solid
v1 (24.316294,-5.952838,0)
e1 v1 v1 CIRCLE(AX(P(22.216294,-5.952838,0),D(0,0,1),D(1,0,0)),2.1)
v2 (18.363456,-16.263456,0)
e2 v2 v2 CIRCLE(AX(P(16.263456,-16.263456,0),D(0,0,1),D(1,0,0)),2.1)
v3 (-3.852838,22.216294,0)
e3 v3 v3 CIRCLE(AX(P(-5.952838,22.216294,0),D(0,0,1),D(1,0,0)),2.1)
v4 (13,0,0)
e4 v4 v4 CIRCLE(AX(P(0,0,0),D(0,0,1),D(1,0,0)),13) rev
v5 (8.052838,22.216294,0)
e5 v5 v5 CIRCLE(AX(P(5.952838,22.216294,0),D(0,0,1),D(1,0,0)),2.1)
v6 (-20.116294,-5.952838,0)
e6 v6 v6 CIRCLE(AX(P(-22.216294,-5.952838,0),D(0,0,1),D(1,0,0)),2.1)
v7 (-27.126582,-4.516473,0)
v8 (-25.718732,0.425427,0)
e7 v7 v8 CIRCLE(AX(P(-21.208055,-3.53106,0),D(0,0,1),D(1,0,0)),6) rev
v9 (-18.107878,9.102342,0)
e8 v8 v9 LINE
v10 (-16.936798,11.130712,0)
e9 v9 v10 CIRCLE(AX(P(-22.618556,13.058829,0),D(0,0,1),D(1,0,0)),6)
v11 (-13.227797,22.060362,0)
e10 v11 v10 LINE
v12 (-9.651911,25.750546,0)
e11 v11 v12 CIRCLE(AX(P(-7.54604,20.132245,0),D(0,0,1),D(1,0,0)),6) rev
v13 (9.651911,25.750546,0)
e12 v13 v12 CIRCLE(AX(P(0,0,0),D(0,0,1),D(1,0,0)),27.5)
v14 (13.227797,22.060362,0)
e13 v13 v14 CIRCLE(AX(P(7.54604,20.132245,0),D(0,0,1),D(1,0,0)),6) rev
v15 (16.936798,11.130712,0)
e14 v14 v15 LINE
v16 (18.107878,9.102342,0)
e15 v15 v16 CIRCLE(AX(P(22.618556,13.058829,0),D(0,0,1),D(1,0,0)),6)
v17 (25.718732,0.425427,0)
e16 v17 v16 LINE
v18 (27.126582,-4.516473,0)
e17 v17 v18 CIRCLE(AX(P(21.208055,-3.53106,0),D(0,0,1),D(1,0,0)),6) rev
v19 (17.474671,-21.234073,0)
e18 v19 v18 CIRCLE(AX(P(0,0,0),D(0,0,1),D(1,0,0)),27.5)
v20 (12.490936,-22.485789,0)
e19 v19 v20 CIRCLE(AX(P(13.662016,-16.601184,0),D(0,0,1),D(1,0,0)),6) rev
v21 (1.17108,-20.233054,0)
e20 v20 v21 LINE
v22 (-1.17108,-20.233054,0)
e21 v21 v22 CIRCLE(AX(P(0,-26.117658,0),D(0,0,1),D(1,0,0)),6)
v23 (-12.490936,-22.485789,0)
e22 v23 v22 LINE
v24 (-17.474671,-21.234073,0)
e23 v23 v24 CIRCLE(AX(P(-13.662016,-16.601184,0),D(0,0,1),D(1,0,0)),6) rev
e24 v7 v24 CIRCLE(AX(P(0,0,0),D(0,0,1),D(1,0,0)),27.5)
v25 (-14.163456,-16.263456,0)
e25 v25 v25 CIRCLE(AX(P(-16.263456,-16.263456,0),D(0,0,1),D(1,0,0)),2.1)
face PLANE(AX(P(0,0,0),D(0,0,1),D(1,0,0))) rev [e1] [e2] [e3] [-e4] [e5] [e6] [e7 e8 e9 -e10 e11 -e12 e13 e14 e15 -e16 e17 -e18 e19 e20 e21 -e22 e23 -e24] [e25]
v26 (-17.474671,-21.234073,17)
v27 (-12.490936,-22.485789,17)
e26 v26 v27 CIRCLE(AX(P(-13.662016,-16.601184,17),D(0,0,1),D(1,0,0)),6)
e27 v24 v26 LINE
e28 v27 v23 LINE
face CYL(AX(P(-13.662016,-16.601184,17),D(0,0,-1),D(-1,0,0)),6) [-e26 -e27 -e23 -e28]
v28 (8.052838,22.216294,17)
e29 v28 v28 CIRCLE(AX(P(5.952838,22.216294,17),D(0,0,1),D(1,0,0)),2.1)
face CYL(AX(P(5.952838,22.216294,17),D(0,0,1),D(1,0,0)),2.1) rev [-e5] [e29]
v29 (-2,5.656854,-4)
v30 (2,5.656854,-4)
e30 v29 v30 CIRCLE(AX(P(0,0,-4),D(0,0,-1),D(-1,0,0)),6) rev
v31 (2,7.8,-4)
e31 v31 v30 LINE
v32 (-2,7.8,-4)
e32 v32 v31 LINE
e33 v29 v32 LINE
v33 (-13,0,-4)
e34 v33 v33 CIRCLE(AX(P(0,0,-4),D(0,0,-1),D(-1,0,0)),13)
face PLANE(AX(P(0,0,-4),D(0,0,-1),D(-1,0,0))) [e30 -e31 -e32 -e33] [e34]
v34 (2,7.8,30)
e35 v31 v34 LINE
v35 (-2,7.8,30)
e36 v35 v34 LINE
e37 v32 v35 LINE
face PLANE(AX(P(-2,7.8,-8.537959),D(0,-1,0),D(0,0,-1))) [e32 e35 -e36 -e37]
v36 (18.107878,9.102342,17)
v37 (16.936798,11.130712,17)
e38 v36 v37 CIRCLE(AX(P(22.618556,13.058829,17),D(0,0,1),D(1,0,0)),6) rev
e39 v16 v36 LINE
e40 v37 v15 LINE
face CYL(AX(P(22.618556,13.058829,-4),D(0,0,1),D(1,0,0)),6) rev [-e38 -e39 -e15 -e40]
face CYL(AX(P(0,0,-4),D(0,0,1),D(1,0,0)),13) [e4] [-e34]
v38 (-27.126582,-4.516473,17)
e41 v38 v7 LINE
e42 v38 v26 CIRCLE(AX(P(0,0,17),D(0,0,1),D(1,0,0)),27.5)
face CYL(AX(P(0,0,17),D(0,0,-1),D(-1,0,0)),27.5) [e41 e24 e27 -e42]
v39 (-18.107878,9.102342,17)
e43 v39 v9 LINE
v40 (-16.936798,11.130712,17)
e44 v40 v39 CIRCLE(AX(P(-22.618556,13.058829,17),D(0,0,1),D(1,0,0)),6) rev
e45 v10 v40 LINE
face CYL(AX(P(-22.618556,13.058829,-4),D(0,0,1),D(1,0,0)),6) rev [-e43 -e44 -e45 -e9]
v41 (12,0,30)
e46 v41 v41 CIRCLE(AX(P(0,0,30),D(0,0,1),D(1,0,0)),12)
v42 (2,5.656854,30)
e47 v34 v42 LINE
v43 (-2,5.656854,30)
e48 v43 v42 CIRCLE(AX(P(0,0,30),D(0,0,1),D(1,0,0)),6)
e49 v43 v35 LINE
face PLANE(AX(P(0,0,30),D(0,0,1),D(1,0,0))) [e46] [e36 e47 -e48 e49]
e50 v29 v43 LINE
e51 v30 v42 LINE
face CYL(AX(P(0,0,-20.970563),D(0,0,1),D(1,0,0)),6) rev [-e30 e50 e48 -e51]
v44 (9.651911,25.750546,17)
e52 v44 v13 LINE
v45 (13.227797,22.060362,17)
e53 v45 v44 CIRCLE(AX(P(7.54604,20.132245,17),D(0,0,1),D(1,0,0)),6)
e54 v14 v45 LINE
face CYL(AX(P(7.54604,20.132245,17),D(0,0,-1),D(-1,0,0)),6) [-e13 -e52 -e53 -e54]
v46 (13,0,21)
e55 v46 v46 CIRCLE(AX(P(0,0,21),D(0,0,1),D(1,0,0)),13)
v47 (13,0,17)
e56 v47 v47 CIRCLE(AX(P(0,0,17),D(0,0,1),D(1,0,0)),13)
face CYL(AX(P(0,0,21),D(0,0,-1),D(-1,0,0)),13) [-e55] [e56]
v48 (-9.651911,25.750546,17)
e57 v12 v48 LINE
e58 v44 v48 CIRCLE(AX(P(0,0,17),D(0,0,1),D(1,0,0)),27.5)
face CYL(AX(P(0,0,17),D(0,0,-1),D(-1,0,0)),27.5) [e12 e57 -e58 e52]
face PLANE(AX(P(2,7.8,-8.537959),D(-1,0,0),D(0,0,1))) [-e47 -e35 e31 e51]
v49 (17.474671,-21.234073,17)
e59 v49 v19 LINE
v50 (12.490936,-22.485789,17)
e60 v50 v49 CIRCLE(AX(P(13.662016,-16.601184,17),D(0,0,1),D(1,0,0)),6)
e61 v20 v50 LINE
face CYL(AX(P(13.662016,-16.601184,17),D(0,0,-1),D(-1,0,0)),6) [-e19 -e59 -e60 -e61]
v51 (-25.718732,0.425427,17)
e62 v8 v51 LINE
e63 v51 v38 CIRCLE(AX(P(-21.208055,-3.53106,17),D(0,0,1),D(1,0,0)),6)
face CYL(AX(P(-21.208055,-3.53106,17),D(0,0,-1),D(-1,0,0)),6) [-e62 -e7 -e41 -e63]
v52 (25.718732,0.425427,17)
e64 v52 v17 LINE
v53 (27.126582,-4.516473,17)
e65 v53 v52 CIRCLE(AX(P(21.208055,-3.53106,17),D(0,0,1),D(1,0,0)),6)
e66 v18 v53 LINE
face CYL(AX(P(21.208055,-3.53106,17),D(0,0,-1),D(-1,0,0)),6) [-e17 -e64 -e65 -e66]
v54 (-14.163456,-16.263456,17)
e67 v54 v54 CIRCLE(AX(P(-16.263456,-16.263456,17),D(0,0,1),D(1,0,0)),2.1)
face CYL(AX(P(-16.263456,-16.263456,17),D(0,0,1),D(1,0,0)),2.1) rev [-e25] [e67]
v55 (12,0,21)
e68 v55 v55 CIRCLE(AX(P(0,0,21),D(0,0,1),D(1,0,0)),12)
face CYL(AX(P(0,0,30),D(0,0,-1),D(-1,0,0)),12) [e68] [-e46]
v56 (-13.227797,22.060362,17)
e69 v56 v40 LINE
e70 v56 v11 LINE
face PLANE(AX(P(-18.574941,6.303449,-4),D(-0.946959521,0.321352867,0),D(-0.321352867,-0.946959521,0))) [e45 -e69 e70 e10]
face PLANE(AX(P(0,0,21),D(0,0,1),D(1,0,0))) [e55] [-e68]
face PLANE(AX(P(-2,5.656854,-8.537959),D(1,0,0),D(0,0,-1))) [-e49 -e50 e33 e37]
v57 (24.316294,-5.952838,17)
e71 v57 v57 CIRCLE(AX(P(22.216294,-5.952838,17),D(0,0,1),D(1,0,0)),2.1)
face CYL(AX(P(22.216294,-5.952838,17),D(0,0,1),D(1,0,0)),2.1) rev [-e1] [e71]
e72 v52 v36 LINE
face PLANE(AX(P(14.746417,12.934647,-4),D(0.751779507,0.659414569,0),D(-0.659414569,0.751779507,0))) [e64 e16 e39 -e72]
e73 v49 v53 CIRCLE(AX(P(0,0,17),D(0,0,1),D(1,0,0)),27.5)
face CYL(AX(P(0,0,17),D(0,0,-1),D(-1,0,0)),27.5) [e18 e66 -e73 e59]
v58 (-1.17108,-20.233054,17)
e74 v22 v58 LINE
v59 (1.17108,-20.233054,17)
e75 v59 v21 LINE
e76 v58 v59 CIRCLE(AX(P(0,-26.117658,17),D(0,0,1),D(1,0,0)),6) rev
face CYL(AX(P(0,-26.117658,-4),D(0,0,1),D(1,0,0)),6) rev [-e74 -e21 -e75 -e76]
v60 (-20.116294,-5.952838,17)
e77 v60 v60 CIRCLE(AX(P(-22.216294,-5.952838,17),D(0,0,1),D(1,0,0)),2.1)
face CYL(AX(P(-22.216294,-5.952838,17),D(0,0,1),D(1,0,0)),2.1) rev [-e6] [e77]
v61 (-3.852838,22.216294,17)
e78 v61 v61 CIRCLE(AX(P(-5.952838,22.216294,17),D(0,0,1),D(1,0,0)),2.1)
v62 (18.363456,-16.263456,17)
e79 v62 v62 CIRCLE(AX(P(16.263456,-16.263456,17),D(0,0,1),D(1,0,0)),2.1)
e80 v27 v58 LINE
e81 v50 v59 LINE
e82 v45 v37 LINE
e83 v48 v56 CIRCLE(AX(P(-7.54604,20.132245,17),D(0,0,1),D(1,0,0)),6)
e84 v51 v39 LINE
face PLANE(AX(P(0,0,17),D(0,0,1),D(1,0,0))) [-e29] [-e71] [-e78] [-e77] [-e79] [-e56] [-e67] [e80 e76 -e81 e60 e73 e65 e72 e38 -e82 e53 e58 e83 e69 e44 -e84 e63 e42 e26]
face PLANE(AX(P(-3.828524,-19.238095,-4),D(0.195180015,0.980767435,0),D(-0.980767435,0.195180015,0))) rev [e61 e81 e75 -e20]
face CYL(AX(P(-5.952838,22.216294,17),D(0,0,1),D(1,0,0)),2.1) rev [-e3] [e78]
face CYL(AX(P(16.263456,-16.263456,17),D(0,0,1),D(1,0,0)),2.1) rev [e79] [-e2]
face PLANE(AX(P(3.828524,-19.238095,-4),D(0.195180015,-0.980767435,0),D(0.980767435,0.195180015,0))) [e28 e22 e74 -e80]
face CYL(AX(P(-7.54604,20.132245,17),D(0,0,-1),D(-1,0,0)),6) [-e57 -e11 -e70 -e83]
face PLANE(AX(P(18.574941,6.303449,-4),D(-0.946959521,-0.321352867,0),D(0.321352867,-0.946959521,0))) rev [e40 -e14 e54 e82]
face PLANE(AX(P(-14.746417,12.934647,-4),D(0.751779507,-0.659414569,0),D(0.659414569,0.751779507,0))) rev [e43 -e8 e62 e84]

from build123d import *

# Parameters (mm, degrees)
SKETCH_1_R                       = 27.5
EXTRUDE_1_DEPTH                  = 17
SKETCH_2_R                       = 13
EXTRUDE_2_DEPTH                  = 4
EXTRUDE_START                    = 4
SKETCH_3_R                       = 13
EXTRUDE_3_DEPTH                  = 4
HOLE_WIZARD_M5_1_D               = 4.2
CUT_EXTRUDE_4_DEPTH              = 45.198416261
FILLET_1_R                       = 6
PATTERN_CIRCULAR_1_COUNT         = 2
PATTERN_CIRCULAR_1_ANGLE         = 120
FILLET_1_OF_PATTERN_CIRCULAR_1_R = 6
PATTERN_CIRCULAR_2_DEPTH         = 17
PATTERN_CIRCULAR_3_COUNT         = 3
SKETCH_15_R                      = 12
EXTRUDE_4_DEPTH                  = 9
SKETCH_16_R                      = 6
CUT_EXTRUDE_5_DEPTH              = 34
SKETCH_17_W                      = 4
SKETCH_17_H                      = 2.143145751
CUT_EXTRUDE_6_DEPTH              = 34


# Read off the part's stored shape, not the designer's step: 阵列(圆周)2
with BuildPart() as part:
    # 草图1 → 凸台-拉伸1 (new body)
    with BuildSketch(Plane.XY):
        Circle(SKETCH_1_R)
    extrude(amount=EXTRUDE_1_DEPTH)

    # 草图2 → 凸台-拉伸2 (add)
    with BuildSketch(Plane(origin=(0, 0, 0), x_dir=(-1, 0, 0), z_dir=(0, 0, -1))):
        with Locations(Location((0, 0, 0), (0, 0, 180))):
            Circle(SKETCH_2_R)
    extrude(amount=EXTRUDE_2_DEPTH)

    # 草图3 → 凸台-拉伸3 (add)
    with BuildSketch(Plane.XY.offset(17).offset(EXTRUDE_START)):
        Circle(SKETCH_3_R)
    extrude(amount=-EXTRUDE_3_DEPTH)

    # M5 螺纹孔1 (through all)
    with Locations(Plane(origin=(16.263455967, -16.263455967, 17), x_dir=(1, 0, 0), z_dir=(0, 0, 1))):
        with Locations((0, 0), (5.952838038, 10.31061793)):
            hole_wizard_m5_1 = Hole(HOLE_WIZARD_M5_1_D / 2)

    # 草图14 → 切除-拉伸4 (cut, through all)
    with BuildSketch(Plane.XY.offset(17)):
        Polygon((0, -23), (0, -20), (-15.074813432, -23), align=None)
        Polygon((15.074813432, -23), (0, -20), (0, -23), align=None)
        with BuildLine():
            Line((15.074813432, -23), (0, -23))
            Line((0, -23), (-15.074813432, -23))
            ThreePointArc((-15.074813432, -23), (0, -27.5), (15.074813432, -23))
        make_face()
    cut_extrude_4 = extrude(amount=-CUT_EXTRUDE_4_DEPTH, mode=Mode.SUBTRACT)

    # 圆角1
    fillet_1_edges = [part.edges().sort_by_distance(p)[0] for p in [
        (15.074813432, -23, 8.5),
        (-15.074813432, -23, 8.5),
        (0, -20, 8.5),
    ]]
    fillet(fillet_1_edges, radius=FILLET_1_R)

    # 阵列(圆周)1: 切除-拉伸4 ×2 about axis
    pattern_circular_1_axis = Axis((0, 0, 0), (0, 0, 1))
    for i in range(1, PATTERN_CIRCULAR_1_COUNT):
        add(cut_extrude_4.rotate(pattern_circular_1_axis, i * PATTERN_CIRCULAR_1_ANGLE / (PATTERN_CIRCULAR_1_COUNT - 1)), mode=Mode.SUBTRACT)

    # 圆角1 of 阵列(圆周)1
    fillet_1_of_pattern_circular_1_edges = [part.edges().sort_by_distance(p)[0] for p in [
        (12.381177571, 24.555171389, 8.5),
        (27.455991003, -1.555171389, 8.5),
        (17.320508076, 10, 8.5),
    ]]
    fillet(fillet_1_of_pattern_circular_1_edges, radius=FILLET_1_OF_PATTERN_CIRCULAR_1_R)

    # 阵列(圆周)2 outline → 阵列(圆周)2 (cut)
    with BuildSketch(Plane.XY):
        with BuildLine():
            Line((-16.936798412, 11.13071193), (-13.227796767, 22.060362126))
            ThreePointArc((-13.227796767, 22.060362126), (-11.854885653, 24.30763066), (-9.651911166, 25.750545836))
            ThreePointArc((-9.651911166, 25.750545836), (-23.815698604, 13.75), (-27.126582438, -4.516472653))
            ThreePointArc((-27.126582438, -4.516472653), (-26.978468484, -1.887183196), (-25.718732401, 0.425426973))
            Line((-25.718732401, 0.425426973), (-18.107878499, 9.102341718))
            ThreePointArc((-18.107878499, 9.102341718), (-17.422403117, 10.05882913), (-16.936798412, 11.13071193))
        make_face()
    extrude(amount=PATTERN_CIRCULAR_2_DEPTH, mode=Mode.SUBTRACT)

    # 阵列(圆周)3: M5 螺纹孔1 ×3 about axis
    pattern_circular_3_axis = Axis((0, 0, 0), (0, 0, 1))
    for i in range(1, PATTERN_CIRCULAR_3_COUNT):
        add(hole_wizard_m5_1.rotate(pattern_circular_3_axis, i * 360 / PATTERN_CIRCULAR_3_COUNT), mode=Mode.SUBTRACT)

    # 草图15 → 凸台-拉伸4 (add)
    with BuildSketch(Plane.XY.offset(21)):
        Circle(SKETCH_15_R)
    extrude(amount=EXTRUDE_4_DEPTH)

    # 草图16 → 切除-拉伸5 (cut)
    with BuildSketch(Plane.XY.offset(30)):
        Circle(SKETCH_16_R)
    extrude(amount=-CUT_EXTRUDE_5_DEPTH, mode=Mode.SUBTRACT)

    # 草图17 → 切除-拉伸6 (cut)
    with BuildSketch(Plane.XY.offset(30)):
        with Locations((0, 6.728427125)):
            Rectangle(SKETCH_17_W, SKETCH_17_H)
    extrude(amount=-CUT_EXTRUDE_6_DEPTH, mode=Mode.SUBTRACT)


solid = part.part
